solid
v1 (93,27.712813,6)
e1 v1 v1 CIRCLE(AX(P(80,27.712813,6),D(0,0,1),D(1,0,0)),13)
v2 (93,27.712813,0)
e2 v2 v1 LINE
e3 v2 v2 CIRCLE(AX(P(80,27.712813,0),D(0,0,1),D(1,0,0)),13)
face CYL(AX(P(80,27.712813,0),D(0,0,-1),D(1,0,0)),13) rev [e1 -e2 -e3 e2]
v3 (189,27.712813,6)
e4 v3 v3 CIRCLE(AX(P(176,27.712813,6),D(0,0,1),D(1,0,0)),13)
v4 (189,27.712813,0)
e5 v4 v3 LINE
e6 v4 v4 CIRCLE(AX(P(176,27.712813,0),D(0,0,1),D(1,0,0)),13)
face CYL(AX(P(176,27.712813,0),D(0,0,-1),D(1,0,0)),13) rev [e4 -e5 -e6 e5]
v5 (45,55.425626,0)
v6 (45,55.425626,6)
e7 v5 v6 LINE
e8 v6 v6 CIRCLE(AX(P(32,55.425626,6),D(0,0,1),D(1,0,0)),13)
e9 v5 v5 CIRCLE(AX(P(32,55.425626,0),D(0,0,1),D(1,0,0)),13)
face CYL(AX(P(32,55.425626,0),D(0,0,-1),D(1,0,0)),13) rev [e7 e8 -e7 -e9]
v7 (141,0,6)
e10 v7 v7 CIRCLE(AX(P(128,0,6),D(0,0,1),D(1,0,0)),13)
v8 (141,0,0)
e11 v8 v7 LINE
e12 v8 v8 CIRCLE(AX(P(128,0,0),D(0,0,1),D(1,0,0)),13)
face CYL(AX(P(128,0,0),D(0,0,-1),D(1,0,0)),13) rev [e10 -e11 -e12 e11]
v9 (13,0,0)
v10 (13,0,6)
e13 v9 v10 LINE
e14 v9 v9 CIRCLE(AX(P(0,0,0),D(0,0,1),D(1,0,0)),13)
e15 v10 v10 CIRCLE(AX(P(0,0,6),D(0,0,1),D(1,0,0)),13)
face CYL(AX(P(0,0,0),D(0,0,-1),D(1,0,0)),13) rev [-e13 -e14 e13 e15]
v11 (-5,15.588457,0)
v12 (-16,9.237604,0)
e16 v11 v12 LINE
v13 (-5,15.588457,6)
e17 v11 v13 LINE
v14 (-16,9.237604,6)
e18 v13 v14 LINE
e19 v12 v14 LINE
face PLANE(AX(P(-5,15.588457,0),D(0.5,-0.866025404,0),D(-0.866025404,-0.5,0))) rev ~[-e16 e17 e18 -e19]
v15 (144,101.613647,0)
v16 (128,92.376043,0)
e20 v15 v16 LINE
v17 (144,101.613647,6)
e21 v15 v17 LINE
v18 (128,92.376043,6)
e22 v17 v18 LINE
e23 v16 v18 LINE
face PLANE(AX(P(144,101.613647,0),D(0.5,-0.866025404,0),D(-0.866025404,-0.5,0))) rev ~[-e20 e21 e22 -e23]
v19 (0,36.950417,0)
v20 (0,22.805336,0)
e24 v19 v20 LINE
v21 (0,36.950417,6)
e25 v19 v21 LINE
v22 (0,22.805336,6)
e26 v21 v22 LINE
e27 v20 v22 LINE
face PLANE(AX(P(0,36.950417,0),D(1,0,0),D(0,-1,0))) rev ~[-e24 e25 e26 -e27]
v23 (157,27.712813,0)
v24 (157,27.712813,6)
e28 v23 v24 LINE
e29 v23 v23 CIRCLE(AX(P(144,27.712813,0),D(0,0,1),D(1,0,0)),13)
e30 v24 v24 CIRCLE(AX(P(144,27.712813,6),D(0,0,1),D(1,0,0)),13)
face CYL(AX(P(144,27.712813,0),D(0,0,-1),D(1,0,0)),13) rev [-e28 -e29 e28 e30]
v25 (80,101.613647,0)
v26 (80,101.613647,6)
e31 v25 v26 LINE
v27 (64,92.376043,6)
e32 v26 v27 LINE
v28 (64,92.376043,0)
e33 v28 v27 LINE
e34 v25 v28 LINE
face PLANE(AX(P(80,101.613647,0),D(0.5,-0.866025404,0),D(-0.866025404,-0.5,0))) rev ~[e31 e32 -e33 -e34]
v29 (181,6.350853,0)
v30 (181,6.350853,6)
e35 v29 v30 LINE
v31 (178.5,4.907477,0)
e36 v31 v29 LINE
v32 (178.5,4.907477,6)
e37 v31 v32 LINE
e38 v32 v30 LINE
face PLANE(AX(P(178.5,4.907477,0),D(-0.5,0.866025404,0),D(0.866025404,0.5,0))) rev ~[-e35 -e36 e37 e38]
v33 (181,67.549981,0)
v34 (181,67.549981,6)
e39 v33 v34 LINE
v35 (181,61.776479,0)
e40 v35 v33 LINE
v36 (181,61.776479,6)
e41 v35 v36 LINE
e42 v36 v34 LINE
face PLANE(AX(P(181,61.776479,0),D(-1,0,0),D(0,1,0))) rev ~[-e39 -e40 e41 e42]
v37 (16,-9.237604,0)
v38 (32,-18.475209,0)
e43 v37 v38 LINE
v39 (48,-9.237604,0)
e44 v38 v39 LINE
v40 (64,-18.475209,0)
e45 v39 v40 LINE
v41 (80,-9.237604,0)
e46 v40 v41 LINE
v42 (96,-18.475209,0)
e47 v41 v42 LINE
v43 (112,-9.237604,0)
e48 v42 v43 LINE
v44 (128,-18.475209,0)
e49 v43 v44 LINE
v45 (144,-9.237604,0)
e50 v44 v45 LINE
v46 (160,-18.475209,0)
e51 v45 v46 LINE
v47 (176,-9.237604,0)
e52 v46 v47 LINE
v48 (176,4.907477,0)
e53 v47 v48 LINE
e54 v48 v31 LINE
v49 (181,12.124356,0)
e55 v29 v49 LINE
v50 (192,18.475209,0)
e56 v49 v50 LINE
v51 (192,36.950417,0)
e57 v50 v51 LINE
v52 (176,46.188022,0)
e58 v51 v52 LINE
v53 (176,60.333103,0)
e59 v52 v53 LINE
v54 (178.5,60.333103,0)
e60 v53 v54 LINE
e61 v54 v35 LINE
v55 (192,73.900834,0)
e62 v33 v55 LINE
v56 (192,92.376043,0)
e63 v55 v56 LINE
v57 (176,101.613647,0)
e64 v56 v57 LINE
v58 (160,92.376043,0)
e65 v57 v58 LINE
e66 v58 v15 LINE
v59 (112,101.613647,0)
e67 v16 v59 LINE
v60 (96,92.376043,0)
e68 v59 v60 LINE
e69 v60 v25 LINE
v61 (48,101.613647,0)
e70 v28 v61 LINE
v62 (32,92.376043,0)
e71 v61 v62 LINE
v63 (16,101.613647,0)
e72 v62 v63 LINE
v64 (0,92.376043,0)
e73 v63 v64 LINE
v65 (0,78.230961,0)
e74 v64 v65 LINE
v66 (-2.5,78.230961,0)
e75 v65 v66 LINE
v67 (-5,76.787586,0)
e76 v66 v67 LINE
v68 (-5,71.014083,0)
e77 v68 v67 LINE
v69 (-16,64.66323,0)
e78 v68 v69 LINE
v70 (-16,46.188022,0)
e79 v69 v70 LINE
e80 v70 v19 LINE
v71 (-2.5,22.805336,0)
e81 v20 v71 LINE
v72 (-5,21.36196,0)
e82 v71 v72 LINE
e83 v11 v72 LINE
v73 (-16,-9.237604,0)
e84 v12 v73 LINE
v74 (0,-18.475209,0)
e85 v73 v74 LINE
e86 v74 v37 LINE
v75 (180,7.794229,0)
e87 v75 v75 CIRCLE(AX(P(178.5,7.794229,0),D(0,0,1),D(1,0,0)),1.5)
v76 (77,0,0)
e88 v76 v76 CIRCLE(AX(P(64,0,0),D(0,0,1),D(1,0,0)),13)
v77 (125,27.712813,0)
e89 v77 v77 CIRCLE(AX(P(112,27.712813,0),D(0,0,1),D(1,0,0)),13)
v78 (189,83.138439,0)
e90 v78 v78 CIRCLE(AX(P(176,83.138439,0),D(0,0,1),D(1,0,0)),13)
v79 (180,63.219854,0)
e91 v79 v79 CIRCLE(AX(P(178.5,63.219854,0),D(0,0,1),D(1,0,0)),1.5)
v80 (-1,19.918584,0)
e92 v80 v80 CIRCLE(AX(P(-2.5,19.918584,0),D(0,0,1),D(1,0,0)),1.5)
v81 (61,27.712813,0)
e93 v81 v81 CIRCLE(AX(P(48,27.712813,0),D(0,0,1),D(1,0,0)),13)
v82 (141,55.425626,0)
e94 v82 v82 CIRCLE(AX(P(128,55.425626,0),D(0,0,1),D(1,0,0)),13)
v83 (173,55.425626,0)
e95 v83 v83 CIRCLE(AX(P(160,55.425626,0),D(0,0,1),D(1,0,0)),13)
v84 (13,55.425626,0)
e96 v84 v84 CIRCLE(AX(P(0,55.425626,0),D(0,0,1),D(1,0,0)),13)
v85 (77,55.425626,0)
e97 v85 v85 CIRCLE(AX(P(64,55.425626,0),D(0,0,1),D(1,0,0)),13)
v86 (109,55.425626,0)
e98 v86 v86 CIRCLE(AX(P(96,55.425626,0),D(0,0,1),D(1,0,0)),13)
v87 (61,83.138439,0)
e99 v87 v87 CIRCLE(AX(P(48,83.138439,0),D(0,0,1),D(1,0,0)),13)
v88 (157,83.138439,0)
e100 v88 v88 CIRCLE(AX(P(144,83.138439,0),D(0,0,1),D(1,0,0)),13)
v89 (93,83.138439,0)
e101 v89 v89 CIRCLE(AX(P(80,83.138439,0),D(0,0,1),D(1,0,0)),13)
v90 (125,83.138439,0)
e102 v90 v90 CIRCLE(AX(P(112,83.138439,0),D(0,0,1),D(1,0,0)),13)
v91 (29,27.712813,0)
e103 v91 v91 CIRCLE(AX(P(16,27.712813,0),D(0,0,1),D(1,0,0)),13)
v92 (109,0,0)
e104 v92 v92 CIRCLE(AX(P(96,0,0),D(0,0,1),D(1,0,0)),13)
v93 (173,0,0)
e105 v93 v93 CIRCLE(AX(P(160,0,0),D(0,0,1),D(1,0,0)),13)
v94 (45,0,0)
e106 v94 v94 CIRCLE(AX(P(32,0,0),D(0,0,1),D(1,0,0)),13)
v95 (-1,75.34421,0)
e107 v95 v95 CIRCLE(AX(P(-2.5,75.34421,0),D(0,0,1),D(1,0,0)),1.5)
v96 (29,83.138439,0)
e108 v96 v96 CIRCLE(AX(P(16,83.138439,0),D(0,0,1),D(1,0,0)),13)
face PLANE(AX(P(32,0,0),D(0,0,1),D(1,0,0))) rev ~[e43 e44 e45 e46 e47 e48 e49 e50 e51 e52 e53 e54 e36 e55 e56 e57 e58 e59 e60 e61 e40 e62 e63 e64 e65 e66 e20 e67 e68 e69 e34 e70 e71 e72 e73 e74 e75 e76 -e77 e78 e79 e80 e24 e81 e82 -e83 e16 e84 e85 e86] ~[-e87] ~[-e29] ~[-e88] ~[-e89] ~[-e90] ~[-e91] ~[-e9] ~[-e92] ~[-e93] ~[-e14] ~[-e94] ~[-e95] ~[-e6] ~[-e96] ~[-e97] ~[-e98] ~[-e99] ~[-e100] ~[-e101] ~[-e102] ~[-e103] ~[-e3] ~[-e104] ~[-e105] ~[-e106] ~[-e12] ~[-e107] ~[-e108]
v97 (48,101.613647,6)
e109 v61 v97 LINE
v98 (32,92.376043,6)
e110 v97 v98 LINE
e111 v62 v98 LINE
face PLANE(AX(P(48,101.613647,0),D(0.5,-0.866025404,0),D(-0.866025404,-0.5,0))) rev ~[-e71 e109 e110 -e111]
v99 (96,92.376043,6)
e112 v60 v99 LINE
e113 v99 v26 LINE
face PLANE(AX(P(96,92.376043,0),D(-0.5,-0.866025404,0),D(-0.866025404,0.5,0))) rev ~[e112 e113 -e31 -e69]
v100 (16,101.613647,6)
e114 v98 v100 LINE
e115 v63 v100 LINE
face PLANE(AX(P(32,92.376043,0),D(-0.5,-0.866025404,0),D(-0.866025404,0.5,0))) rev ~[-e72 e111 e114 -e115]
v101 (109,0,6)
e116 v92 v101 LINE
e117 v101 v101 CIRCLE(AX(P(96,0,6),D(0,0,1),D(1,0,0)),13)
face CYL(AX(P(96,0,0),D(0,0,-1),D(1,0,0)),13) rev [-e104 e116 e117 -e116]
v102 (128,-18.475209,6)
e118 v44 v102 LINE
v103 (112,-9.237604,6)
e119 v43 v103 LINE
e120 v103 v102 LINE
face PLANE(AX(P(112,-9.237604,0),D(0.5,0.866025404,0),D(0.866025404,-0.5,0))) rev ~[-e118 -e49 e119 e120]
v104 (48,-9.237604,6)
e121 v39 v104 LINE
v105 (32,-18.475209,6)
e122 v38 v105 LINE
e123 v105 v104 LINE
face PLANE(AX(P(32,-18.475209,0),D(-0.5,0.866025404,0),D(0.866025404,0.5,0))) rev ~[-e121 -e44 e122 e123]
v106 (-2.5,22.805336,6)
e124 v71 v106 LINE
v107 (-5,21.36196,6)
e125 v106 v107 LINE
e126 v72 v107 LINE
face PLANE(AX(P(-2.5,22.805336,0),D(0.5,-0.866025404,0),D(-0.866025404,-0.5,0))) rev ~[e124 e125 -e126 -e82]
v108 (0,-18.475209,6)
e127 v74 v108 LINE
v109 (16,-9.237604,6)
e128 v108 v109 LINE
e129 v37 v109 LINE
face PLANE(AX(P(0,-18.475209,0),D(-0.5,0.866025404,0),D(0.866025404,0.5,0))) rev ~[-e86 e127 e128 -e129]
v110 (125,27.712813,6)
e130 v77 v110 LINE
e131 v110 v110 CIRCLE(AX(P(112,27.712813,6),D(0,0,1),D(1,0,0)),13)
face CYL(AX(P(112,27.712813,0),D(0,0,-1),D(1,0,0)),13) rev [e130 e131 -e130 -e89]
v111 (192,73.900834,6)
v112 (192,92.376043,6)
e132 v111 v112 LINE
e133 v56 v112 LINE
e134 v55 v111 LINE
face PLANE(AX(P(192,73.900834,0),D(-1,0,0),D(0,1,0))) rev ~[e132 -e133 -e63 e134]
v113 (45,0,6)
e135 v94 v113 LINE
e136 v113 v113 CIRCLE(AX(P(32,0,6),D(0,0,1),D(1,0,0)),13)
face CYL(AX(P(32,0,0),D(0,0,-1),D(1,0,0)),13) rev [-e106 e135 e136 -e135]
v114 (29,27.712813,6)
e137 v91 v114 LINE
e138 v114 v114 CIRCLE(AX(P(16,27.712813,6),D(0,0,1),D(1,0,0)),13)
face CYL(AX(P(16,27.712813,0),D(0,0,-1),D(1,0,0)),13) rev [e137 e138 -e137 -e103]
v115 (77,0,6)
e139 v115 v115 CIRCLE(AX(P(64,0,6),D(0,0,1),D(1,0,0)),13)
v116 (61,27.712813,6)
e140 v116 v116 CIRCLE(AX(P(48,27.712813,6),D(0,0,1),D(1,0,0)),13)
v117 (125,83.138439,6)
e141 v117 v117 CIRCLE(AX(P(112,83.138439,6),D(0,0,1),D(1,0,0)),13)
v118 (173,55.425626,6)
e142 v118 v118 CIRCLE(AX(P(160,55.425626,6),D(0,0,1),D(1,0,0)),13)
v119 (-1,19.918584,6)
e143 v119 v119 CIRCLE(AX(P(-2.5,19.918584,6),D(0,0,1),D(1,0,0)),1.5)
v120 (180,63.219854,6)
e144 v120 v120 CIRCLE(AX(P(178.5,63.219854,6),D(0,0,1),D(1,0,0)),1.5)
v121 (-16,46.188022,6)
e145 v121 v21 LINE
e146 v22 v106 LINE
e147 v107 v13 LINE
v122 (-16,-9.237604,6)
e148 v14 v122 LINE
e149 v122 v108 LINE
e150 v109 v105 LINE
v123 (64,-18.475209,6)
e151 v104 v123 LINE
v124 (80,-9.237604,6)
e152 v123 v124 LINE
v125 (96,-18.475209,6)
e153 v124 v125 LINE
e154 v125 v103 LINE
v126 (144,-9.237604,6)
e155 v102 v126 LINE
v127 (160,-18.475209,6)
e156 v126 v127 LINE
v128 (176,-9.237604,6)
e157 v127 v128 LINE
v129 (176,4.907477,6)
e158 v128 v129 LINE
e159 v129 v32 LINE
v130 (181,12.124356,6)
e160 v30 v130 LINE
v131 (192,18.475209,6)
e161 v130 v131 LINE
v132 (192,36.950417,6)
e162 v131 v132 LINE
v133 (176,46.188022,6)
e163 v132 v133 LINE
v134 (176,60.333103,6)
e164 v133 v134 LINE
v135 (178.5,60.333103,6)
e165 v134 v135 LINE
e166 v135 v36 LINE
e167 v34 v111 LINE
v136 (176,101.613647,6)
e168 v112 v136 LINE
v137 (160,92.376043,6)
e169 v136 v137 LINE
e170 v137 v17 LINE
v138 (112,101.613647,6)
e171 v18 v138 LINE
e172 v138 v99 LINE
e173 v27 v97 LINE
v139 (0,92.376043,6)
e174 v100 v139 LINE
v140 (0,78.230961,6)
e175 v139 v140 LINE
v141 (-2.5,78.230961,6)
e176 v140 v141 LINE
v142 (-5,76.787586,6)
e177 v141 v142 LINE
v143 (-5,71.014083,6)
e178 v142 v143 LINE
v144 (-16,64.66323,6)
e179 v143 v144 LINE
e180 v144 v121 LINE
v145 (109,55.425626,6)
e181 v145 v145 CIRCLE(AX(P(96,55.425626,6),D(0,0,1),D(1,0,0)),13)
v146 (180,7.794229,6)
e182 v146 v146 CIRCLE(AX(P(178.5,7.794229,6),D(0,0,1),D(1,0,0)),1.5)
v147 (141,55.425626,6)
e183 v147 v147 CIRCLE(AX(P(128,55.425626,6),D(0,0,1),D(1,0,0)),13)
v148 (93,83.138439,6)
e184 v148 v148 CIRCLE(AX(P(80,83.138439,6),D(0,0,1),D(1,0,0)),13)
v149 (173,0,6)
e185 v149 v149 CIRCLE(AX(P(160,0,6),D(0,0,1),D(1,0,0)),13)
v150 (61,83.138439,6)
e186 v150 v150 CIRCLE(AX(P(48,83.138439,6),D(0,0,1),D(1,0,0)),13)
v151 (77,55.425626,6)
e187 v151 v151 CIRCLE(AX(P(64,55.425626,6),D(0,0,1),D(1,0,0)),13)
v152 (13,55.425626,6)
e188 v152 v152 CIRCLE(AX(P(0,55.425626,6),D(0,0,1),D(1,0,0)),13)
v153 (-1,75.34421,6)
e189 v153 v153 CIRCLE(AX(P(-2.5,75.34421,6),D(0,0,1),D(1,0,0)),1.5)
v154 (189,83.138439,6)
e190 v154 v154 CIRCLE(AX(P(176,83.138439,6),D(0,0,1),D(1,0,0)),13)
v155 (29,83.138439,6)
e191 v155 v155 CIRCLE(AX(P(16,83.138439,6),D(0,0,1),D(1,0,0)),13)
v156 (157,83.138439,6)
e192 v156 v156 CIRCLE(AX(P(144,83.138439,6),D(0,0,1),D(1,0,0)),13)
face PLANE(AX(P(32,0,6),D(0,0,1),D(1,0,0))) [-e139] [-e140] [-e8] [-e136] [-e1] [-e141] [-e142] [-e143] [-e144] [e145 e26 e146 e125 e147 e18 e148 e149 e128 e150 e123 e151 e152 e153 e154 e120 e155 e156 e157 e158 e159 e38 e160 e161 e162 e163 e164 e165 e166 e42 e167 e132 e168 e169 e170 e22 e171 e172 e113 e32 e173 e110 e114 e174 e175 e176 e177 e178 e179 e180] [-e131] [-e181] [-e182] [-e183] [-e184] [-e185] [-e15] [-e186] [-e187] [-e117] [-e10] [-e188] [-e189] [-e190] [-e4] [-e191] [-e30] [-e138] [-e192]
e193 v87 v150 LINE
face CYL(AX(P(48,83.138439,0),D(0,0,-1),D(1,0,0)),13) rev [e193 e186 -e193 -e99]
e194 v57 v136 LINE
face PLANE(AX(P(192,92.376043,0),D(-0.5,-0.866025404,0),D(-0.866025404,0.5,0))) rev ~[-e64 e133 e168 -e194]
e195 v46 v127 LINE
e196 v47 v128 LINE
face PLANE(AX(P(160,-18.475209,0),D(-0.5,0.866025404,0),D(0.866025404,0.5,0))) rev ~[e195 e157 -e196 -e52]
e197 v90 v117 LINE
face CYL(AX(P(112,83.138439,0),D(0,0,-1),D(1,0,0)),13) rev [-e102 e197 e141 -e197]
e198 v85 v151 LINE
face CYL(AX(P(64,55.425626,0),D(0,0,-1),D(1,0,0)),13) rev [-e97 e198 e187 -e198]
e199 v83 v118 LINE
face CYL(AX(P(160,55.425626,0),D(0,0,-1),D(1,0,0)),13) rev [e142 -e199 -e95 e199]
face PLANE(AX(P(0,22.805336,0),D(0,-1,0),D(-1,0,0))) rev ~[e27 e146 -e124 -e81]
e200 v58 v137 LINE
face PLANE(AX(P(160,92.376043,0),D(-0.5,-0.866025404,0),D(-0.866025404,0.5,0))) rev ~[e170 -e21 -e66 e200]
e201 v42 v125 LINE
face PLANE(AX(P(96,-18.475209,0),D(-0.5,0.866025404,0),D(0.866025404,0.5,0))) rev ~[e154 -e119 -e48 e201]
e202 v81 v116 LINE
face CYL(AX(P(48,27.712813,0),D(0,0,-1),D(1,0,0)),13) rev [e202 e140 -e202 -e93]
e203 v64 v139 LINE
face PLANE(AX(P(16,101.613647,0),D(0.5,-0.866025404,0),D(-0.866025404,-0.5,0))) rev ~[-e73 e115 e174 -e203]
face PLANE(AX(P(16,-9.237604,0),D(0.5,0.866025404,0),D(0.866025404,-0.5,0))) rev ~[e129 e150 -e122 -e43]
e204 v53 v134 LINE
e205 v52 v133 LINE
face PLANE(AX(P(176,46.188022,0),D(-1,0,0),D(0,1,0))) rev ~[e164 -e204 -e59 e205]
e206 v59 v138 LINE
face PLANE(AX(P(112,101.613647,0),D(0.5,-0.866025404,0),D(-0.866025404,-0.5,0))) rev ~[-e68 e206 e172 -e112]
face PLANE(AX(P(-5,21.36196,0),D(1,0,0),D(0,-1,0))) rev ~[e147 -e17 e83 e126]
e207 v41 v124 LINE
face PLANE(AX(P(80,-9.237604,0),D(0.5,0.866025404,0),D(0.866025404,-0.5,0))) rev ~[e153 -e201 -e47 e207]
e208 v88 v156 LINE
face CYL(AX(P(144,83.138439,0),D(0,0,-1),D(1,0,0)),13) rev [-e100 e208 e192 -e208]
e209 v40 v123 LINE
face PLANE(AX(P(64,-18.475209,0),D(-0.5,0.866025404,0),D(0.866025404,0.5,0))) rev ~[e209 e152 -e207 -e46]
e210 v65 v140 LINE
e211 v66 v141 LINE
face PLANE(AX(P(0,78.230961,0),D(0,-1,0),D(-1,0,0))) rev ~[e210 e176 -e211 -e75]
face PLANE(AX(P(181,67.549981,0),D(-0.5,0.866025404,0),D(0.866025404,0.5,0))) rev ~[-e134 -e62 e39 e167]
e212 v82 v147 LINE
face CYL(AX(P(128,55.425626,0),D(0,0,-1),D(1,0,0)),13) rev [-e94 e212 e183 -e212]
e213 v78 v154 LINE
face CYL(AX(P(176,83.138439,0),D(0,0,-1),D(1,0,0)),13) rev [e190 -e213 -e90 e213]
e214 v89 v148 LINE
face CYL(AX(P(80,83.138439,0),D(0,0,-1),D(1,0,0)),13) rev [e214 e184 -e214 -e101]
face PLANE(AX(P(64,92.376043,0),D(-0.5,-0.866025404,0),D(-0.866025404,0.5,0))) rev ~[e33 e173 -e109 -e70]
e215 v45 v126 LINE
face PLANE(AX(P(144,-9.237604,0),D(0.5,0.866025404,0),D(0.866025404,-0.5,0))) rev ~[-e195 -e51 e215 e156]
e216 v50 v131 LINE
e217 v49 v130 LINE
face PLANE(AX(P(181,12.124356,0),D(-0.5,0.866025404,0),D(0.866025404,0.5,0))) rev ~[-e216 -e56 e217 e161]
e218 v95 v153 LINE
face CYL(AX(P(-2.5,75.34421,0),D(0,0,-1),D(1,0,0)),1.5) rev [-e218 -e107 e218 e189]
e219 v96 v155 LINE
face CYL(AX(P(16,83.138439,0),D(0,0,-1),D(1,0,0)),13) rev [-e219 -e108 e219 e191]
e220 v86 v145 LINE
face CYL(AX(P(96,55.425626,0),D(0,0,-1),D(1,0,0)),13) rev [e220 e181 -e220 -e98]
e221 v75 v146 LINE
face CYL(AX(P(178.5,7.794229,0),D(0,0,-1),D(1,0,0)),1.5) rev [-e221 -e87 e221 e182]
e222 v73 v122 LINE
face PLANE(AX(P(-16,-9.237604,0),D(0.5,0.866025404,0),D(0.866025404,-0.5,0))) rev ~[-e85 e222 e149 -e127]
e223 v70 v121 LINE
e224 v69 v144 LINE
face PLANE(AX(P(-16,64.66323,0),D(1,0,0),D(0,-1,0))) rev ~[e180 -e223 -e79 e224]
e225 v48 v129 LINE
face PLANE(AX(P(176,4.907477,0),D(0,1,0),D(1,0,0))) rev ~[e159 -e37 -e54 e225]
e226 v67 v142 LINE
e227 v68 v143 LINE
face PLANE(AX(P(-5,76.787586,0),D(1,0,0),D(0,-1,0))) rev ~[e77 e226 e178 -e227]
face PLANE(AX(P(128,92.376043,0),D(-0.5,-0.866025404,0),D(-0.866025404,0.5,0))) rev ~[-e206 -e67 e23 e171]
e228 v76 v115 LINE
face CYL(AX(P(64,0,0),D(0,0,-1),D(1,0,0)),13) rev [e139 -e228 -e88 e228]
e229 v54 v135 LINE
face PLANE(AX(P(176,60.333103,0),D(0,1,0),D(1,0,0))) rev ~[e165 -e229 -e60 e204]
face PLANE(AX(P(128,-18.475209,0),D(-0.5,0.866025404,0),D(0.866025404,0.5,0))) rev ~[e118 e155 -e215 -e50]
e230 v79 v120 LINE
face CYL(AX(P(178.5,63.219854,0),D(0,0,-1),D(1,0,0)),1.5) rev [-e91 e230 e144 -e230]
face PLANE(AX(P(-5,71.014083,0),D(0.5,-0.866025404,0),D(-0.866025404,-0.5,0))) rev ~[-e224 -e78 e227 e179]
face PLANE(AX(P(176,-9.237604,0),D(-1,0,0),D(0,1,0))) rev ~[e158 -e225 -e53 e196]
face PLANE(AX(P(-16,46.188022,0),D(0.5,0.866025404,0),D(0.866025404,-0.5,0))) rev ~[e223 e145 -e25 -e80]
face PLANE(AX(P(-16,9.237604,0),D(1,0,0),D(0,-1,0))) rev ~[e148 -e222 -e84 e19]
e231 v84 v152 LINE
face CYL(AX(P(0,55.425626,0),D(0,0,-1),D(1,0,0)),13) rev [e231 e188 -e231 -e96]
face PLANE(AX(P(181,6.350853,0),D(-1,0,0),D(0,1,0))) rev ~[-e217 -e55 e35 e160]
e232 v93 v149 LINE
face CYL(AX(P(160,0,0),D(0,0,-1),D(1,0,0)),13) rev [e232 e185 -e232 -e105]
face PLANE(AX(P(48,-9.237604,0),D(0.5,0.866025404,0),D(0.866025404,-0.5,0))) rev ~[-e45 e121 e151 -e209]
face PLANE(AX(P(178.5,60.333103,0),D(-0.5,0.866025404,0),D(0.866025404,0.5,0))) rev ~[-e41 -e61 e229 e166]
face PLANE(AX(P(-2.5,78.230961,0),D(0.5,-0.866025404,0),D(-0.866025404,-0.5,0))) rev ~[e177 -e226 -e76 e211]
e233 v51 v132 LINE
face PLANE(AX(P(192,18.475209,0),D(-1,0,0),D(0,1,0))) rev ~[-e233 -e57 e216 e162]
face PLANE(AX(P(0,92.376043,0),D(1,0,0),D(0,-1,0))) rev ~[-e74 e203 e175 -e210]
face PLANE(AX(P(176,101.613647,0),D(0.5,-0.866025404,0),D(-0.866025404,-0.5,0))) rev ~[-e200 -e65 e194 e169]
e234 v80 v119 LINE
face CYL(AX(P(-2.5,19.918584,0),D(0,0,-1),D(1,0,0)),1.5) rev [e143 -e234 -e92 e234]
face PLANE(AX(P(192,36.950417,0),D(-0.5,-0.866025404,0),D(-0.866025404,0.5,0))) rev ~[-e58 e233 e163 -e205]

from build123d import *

# Parameters (mm, degrees)
F0_R     = 13
F0_R_2   = 1.5
F1_DEPTH = 6
F2_DEPTH = 6


# Not quite as in the source:
# - a feature names something its author has since deleted; it is built from what else it names


with BuildPart() as f1:
    # F0 (on Top) → F1 (new body)
    with BuildSketch(Plane.XY):
        Polygon((32, 18.4752086141), (16, 9.237604307), (16, -9.237604307), (32, -18.4752086141), (48, -9.237604307), (48, 9.237604307), align=None)
        with Locations((32, 0)):
            Circle(F0_R, mode=Mode.SUBTRACT)
        Polygon((16, -9.237604307), (16, 9.237604307), (0, 18.4752086141), (-2.5, 17.0318329411), (-5, 15.5884572681), (-16, 9.237604307), (-16, -9.237604307), (0, -18.4752086141), align=None)
        Circle(F0_R, mode=Mode.SUBTRACT)
        Polygon((0, 18.4752086141), (16, 9.237604307), (32, 18.4752086141), (32, 36.9504172281), (16, 46.1880215352), (0, 36.9504172281), (0, 22.805335633), (0, 21.36195996), align=None)
        with Locations((16, 27.7128129211)):
            Circle(F0_R, mode=Mode.SUBTRACT)
        Polygon((-2.5, 17.0318329411), (0, 18.4752086141), (0, 21.36195996), (-2.5, 22.805335633), (-5, 21.36195996), (-5, 18.4752086141), align=None)
        with Locations((-2.5, 19.918584287)):
            Circle(F0_R_2, mode=Mode.SUBTRACT)
        Polygon((32, 36.9504172281), (32, 18.4752086141), (48, 9.237604307), (64, 18.4752086141), (64, 36.9504172281), (48, 46.1880215352), align=None)
        with Locations((48, 27.7128129211)):
            Circle(F0_R, mode=Mode.SUBTRACT)
        Polygon((64, 18.4752086141), (48, 9.237604307), (48, -9.237604307), (64, -18.4752086141), (80, -9.237604307), (80, 9.237604307), align=None)
        with Locations((64, 0)):
            Circle(F0_R, mode=Mode.SUBTRACT)
        Polygon((16, 46.1880215352), (32, 36.9504172281), (48, 46.1880215352), (48, 64.6632301492), (32, 73.9008344563), (16, 64.6632301492), align=None)
        with Locations((32, 55.4256258422)):
            Circle(F0_R, mode=Mode.SUBTRACT)
        Polygon((64, 36.9504172281), (64, 18.4752086141), (80, 9.237604307), (96, 18.4752086141), (96, 36.9504172281), (80, 46.1880215352), align=None)
        with Locations((80, 27.7128129211)):
            Circle(F0_R, mode=Mode.SUBTRACT)
        Polygon((0, 36.9504172281), (16, 46.1880215352), (16, 64.6632301492), (0, 73.9008344563), (-2.5, 72.4574587833), (-5, 71.0140831103), (-16, 64.6632301492), (-16, 46.1880215352), align=None)
        with Locations((0, 55.4256258422)):
            Circle(F0_R, mode=Mode.SUBTRACT)
        Polygon((48, 64.6632301492), (48, 46.1880215352), (64, 36.9504172281), (80, 46.1880215352), (80, 64.6632301492), (64, 73.9008344563), align=None)
        with Locations((64, 55.4256258422)):
            Circle(F0_R, mode=Mode.SUBTRACT)
        Polygon((96, 18.4752086141), (80, 9.237604307), (80, -9.237604307), (96, -18.4752086141), (112, -9.237604307), (112, 9.237604307), align=None)
        with Locations((96, 0)):
            Circle(F0_R, mode=Mode.SUBTRACT)
        Polygon((32, 73.9008344563), (48, 64.6632301492), (64, 73.9008344563), (64, 92.3760430703), (48, 101.6136473774), (32, 92.3760430703), align=None)
        with Locations((48, 83.1384387633)):
            Circle(F0_R, mode=Mode.SUBTRACT)
        Polygon((96, 36.9504172281), (96, 18.4752086141), (112, 9.237604307), (128, 18.4752086141), (128, 36.9504172281), (112, 46.1880215352), align=None)
        with Locations((112, 27.7128129211)):
            Circle(F0_R, mode=Mode.SUBTRACT)
        Polygon((80, 64.6632301492), (80, 46.1880215352), (96, 36.9504172281), (112, 46.1880215352), (112, 64.6632301492), (96, 73.9008344563), align=None)
        with Locations((96, 55.4256258422)):
            Circle(F0_R, mode=Mode.SUBTRACT)
        Polygon((-2.5, 72.4574587833), (0, 73.9008344563), (0, 76.7875858022), (-2.5, 78.2309614752), (-5, 76.7875858022), (-5, 73.9008344563), align=None)
        with Locations((-2.5, 75.3442101292)):
            Circle(F0_R_2, mode=Mode.SUBTRACT)
        Polygon((64, 92.3760430703), (64, 73.9008344563), (80, 64.6632301492), (96, 73.9008344563), (96, 92.3760430703), (80, 101.6136473774), align=None)
        with Locations((80, 83.1384387633)):
            Circle(F0_R, mode=Mode.SUBTRACT)
        Polygon((128, 18.4752086141), (112, 9.237604307), (112, -9.237604307), (128, -18.4752086141), (144, -9.237604307), (144, 9.237604307), align=None)
        with Locations((128, 0)):
            Circle(F0_R, mode=Mode.SUBTRACT)
        Polygon((128, 36.9504172281), (128, 18.4752086141), (144, 9.237604307), (160, 18.4752086141), (160, 36.9504172281), (144, 46.1880215352), align=None)
        with Locations((144, 27.7128129211)):
            Circle(F0_R, mode=Mode.SUBTRACT)
        Polygon((112, 64.6632301492), (112, 46.1880215352), (128, 36.9504172281), (144, 46.1880215352), (144, 64.6632301492), (128, 73.9008344563), align=None)
        with Locations((128, 55.4256258422)):
            Circle(F0_R, mode=Mode.SUBTRACT)
        Polygon((96, 92.3760430703), (96, 73.9008344563), (112, 64.6632301492), (128, 73.9008344563), (128, 92.3760430703), (112, 101.6136473774), align=None)
        with Locations((112, 83.1384387633)):
            Circle(F0_R, mode=Mode.SUBTRACT)
        Polygon((160, 18.4752086141), (144, 9.237604307), (144, -9.237604307), (160, -18.4752086141), (176, -9.237604307), (176, 4.9074772881), (176, 6.3508529611), (176, 9.237604307), align=None)
        with Locations((160, 0)):
            Circle(F0_R, mode=Mode.SUBTRACT)
        Polygon((160, 36.9504172281), (160, 18.4752086141), (176, 9.237604307), (178.5, 10.68097998), (181, 12.124355653), (192, 18.4752086141), (192, 36.9504172281), (176, 46.1880215352), align=None)
        with Locations((176, 27.7128129211)):
            Circle(F0_R, mode=Mode.SUBTRACT)
        Polygon((144, 64.6632301492), (144, 46.1880215352), (160, 36.9504172281), (176, 46.1880215352), (176, 60.3331031303), (176, 61.7764788033), (176, 64.6632301492), (160, 73.9008344563), align=None)
        with Locations((160, 55.4256258422)):
            Circle(F0_R, mode=Mode.SUBTRACT)
        Polygon((128, 92.3760430703), (128, 73.9008344563), (144, 64.6632301492), (160, 73.9008344563), (160, 92.3760430703), (144, 101.6136473774), align=None)
        with Locations((144, 83.1384387633)):
            Circle(F0_R, mode=Mode.SUBTRACT)
        Polygon((160, 92.3760430703), (160, 73.9008344563), (176, 64.6632301492), (178.5, 66.1066058222), (181, 67.5499814952), (192, 73.9008344563), (192, 92.3760430703), (176, 101.6136473774), align=None)
        with Locations((176, 83.1384387633)):
            Circle(F0_R, mode=Mode.SUBTRACT)
    extrude(amount=F1_DEPTH)

    # F0 (on Top) → F2 (join)
    with BuildSketch(Plane.XY):
        Polygon((0, 18.4752086141), (16, 9.237604307), (32, 18.4752086141), (32, 36.9504172281), (16, 46.1880215352), (0, 36.9504172281), (0, 22.805335633), (0, 21.36195996), align=None)
        with Locations((16, 27.7128129211)):
            Circle(F0_R, mode=Mode.SUBTRACT)
        Polygon((0, 73.9008344563), (16, 64.6632301492), (32, 73.9008344563), (32, 92.3760430703), (16, 101.6136473774), (0, 92.3760430703), (0, 78.2309614752), (0, 76.7875858022), align=None)
        with Locations((16, 83.1384387633)):
            Circle(F0_R, mode=Mode.SUBTRACT)
        Polygon((178.5, 10.68097998), (176, 9.237604307), (176, 6.3508529611), (178.5, 4.9074772881), (181, 6.3508529611), (181, 9.237604307), align=None)
        with Locations((178.5, 7.7942286341)):
            Circle(F0_R_2, mode=Mode.SUBTRACT)
        Polygon((178.5, 66.1066058222), (176, 64.6632301492), (176, 61.7764788033), (178.5, 60.3331031303), (181, 61.7764788033), (181, 64.6632301492), align=None)
        with Locations((178.5, 63.2198544763)):
            Circle(F0_R_2, mode=Mode.SUBTRACT)
        Polygon((-5, 71.0140831103), (-2.5, 72.4574587833), (-5, 73.9008344563), align=None)
        Polygon((-2.5, 78.2309614752), (0, 76.7875858022), (0, 78.2309614752), align=None)
        Polygon((-2.5, 22.805335633), (0, 21.36195996), (0, 22.805335633), align=None)
        Polygon((-5, 15.5884572681), (-2.5, 17.0318329411), (-5, 18.4752086141), align=None)
        Polygon((176, 61.7764788033), (176, 60.3331031303), (178.5, 60.3331031303), align=None)
        Polygon((181, 67.5499814952), (178.5, 66.1066058222), (181, 64.6632301492), align=None)
        Polygon((178.5, 4.9074772881), (176, 6.3508529611), (176, 4.9074772881), align=None)
        Polygon((181, 12.124355653), (178.5, 10.68097998), (181, 9.237604307), align=None)
    extrude(amount=F2_DEPTH)


solid = f1.part
